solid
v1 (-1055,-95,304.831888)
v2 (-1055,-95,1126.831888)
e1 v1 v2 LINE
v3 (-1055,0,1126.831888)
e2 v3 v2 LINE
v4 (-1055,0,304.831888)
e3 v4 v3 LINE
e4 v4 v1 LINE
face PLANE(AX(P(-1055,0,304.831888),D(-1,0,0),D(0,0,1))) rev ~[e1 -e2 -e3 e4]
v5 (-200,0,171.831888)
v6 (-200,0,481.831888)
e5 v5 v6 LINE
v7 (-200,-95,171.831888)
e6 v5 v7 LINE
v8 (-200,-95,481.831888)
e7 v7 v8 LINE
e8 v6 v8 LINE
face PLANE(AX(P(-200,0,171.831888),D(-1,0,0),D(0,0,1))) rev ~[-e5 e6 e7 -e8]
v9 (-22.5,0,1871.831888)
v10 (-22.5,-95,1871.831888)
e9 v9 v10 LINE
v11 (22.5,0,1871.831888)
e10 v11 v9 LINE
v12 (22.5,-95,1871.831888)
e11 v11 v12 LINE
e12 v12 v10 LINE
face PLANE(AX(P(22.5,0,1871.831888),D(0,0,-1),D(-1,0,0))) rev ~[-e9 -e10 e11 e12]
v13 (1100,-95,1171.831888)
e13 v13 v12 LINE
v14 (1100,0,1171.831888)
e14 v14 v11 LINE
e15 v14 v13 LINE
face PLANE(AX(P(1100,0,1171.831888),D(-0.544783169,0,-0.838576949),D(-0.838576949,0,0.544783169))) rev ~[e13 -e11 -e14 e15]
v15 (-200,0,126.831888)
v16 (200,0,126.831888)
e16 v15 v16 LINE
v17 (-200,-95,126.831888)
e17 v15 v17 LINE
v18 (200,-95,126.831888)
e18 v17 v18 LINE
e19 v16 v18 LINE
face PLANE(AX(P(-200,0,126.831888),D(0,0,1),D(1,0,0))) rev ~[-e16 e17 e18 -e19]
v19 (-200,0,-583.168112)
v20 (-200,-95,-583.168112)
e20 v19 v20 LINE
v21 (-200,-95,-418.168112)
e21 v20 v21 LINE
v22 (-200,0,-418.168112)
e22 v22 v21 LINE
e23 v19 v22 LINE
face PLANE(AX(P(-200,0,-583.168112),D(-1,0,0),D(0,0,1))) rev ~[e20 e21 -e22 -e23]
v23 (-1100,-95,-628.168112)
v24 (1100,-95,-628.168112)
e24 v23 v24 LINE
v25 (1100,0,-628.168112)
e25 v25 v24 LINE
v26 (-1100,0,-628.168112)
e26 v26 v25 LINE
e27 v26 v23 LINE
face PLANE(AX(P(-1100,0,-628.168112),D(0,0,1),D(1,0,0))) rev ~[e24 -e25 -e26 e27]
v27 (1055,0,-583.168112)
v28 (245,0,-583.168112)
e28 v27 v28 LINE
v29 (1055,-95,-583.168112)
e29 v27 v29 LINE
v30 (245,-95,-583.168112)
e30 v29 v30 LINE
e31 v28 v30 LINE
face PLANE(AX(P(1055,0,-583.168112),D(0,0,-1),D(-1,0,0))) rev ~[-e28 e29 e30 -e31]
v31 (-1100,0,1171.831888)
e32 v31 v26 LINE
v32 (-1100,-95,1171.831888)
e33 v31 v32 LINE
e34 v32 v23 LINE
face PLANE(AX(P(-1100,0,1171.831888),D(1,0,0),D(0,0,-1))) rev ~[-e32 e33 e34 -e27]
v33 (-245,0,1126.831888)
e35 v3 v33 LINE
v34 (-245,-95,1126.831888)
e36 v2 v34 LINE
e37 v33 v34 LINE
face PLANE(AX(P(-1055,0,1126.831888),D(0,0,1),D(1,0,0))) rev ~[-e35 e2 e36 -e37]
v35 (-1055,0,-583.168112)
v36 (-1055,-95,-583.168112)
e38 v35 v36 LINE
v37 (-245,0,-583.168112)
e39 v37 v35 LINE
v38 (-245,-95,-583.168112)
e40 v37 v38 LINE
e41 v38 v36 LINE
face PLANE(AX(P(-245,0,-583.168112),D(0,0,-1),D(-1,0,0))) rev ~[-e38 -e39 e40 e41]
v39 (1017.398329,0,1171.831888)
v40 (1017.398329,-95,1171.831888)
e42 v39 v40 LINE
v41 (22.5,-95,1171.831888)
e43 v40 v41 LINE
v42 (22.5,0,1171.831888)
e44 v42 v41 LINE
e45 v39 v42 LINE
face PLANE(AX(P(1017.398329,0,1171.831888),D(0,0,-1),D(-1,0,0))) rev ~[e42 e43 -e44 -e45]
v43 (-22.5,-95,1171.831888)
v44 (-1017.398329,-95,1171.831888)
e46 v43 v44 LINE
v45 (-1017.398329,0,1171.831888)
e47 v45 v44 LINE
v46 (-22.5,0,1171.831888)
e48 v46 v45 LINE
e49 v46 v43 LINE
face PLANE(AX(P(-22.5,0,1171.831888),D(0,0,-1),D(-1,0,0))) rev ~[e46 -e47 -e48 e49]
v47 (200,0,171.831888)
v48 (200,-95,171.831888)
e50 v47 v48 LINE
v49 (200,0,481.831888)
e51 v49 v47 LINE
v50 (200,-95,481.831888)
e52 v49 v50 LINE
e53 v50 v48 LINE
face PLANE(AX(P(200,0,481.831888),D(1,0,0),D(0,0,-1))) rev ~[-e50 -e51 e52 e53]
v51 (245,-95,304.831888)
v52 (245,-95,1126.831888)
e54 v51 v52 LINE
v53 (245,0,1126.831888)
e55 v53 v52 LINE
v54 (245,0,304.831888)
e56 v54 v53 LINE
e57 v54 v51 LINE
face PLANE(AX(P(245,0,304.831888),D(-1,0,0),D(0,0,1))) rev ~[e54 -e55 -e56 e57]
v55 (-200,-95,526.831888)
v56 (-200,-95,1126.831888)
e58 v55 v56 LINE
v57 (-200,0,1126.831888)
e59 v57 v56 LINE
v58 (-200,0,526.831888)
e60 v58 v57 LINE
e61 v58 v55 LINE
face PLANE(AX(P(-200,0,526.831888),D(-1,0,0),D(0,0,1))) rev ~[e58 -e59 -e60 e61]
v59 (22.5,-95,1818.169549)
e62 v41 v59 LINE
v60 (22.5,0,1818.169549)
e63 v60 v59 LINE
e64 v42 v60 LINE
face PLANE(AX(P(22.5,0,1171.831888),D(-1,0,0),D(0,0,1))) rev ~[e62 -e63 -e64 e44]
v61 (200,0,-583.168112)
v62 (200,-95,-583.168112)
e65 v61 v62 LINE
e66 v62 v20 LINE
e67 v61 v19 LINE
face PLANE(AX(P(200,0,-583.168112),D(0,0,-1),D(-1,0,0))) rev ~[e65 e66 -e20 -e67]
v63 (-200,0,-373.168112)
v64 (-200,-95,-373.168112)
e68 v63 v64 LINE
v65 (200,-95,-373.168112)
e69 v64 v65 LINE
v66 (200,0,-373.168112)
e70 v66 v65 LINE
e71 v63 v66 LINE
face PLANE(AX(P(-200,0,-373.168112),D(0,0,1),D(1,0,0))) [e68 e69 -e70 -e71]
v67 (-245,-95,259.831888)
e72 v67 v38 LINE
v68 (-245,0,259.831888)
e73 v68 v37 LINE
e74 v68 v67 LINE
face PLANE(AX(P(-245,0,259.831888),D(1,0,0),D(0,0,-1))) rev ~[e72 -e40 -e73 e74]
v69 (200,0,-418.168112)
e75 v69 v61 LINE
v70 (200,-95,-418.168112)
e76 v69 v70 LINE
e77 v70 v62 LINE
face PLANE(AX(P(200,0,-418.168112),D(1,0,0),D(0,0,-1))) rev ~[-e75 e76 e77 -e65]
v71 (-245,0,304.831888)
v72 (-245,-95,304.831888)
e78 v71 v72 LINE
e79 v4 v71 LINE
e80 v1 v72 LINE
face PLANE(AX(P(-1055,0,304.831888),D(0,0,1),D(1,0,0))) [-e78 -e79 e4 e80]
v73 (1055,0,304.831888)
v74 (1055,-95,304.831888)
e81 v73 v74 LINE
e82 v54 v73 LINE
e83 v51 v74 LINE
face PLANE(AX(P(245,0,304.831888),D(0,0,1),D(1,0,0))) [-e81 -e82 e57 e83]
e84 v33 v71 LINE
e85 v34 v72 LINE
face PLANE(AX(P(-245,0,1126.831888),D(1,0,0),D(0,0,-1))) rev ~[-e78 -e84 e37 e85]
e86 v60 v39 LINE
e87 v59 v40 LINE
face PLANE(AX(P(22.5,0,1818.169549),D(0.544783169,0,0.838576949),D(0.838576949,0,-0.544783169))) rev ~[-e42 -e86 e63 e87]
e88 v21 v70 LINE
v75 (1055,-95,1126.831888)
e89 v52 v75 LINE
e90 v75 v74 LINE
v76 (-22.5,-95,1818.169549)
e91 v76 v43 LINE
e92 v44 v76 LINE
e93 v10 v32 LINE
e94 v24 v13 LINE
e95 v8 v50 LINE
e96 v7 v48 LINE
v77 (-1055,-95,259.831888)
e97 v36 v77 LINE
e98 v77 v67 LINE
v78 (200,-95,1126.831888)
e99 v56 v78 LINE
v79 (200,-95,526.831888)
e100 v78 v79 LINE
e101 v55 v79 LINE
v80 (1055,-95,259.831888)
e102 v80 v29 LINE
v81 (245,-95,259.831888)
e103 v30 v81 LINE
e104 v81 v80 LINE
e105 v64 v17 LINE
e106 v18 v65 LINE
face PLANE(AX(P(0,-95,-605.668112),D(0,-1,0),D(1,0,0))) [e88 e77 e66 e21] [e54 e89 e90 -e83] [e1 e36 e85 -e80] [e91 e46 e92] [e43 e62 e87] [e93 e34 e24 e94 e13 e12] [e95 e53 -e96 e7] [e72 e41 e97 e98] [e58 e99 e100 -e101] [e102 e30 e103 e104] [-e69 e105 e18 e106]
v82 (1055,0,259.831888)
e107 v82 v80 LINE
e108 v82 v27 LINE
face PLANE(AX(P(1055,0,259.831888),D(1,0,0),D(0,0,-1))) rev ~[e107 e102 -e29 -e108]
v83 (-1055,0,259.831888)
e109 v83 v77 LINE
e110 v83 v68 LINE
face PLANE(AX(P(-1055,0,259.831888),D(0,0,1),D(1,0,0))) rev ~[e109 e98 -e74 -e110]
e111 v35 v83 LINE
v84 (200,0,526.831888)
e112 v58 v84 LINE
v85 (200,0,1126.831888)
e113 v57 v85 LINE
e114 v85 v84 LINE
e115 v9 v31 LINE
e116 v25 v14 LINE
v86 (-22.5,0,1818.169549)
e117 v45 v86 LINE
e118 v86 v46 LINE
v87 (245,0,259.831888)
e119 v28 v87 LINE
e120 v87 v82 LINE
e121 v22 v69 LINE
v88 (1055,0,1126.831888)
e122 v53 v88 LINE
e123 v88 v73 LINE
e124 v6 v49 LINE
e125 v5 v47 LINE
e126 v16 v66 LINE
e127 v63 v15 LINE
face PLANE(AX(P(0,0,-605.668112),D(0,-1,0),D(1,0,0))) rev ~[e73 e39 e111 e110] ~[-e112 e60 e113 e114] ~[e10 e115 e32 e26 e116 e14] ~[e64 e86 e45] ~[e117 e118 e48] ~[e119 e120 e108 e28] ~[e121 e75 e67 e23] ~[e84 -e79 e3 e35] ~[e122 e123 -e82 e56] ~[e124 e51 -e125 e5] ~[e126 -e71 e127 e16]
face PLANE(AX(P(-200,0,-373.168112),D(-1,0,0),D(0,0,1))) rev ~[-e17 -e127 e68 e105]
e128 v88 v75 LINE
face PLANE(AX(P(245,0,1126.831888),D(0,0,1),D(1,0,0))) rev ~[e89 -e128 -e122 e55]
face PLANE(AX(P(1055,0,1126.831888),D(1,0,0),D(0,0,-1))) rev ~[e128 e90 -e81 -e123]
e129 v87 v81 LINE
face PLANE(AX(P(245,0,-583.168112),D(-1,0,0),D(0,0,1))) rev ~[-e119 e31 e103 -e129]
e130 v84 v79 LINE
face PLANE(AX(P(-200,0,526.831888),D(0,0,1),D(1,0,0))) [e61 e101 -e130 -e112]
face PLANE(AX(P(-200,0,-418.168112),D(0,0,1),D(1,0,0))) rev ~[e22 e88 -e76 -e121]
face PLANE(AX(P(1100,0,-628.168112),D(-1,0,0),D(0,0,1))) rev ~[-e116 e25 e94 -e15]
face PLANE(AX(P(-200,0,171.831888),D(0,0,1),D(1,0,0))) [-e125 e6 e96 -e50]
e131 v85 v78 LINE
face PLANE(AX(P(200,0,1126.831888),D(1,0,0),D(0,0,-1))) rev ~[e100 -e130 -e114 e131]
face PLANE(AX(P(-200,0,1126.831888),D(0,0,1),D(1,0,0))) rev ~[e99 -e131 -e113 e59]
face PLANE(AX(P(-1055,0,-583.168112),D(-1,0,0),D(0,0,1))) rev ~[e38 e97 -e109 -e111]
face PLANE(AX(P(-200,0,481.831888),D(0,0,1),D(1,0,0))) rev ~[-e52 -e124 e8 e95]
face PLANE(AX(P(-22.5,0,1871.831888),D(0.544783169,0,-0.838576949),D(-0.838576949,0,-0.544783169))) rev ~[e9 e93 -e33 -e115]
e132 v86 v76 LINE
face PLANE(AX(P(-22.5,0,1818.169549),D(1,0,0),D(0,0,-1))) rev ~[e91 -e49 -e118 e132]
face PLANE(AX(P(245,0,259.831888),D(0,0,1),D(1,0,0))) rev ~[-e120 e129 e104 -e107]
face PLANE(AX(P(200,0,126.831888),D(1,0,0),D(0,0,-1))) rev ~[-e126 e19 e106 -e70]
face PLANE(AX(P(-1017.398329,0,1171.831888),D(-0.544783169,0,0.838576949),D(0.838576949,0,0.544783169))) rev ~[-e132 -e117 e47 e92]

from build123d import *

# Parameters (mm, degrees)
F0_W     = 810
F0_H     = 45
F0_W_2   = 400
F1_DEPTH = 95


# Not quite as in the source:
# - a feature names something its author has since deleted; it is built from what else it names


with BuildPart() as f1:
    # F0 (on Front) → F1 (new body)
    with BuildSketch(Plane.XZ):
        Polygon((1100, -628.1681121112), (1100, -583.1681121112), (1055, -583.1681121112), (245, -583.1681121112), (200, -583.1681121112), (-200, -583.1681121112), (-245, -583.1681121112), (-1055, -583.1681121112), (-1100, -583.1681121112), (-1100, -628.1681121112), align=None)
        Polygon((1055, -583.1681121112), (1100, -583.1681121112), (1100, 1126.8318878888), (1055, 1126.8318878888), (1055, 304.8318878888), (1055, 259.8318878888), align=None)
        Polygon((1055, 1126.8318878888), (1100, 1126.8318878888), (1100, 1171.8318878888), (1017.398329114, 1171.8318878888), (22.5, 1171.8318878888), (-22.5, 1171.8318878888), (-1017.398329114, 1171.8318878888), (-1100, 1171.8318878888), (-1100, 1126.8318878888), (-1055, 1126.8318878888), (-245, 1126.8318878888), (-200, 1126.8318878888), (200, 1126.8318878888), (245, 1126.8318878888), align=None)
        Polygon((1017.398329114, 1171.8318878888), (1100, 1171.8318878888), (22.5, 1871.8318878888), (22.5, 1818.1695494942), align=None)
        Polygon((-1100, 1126.8318878888), (-1100, -583.1681121112), (-1055, -583.1681121112), (-1055, 259.8318878888), (-1055, 304.8318878888), (-1055, 1126.8318878888), align=None)
        Polygon((22.5, 1818.1695494942), (22.5, 1871.8318878888), (-22.5, 1871.8318878888), (-22.5, 1818.1695494942), (-22.5, 1171.8318878888), (22.5, 1171.8318878888), align=None)
        Polygon((-22.5, 1818.1695494942), (-22.5, 1871.8318878888), (-1100, 1171.8318878888), (-1017.398329114, 1171.8318878888), align=None)
        Polygon((-245, -583.1681121112), (-200, -583.1681121112), (-200, -418.1681121112), (-200, -373.1681121112), (-200, 126.8318878888), (-200, 171.8318878888), (-200, 481.8318878888), (-200, 526.8318878888), (-200, 1126.8318878888), (-245, 1126.8318878888), (-245, 304.8318878888), (-245, 259.8318878888), align=None)
        Polygon((200, -583.1681121112), (245, -583.1681121112), (245, 259.8318878888), (245, 304.8318878888), (245, 1126.8318878888), (200, 1126.8318878888), (200, 526.8318878888), (200, 481.8318878888), (200, 171.8318878888), (200, 126.8318878888), (200, -373.1681121112), (200, -418.1681121112), align=None)
        with Locations((-650, 282.3318878888)):
            Rectangle(F0_W, F0_H)
        with Locations((0, -395.6681121112)):
            Rectangle(F0_W_2, F0_H)
        with Locations((0, 149.3318878888)):
            Rectangle(F0_W_2, F0_H)
        with Locations((650, 282.3318878888)):
            Rectangle(F0_W, F0_H)
        with Locations((0, 504.3318878888)):
            Rectangle(F0_W_2, F0_H)
    extrude(amount=F1_DEPTH)


solid = f1.part
